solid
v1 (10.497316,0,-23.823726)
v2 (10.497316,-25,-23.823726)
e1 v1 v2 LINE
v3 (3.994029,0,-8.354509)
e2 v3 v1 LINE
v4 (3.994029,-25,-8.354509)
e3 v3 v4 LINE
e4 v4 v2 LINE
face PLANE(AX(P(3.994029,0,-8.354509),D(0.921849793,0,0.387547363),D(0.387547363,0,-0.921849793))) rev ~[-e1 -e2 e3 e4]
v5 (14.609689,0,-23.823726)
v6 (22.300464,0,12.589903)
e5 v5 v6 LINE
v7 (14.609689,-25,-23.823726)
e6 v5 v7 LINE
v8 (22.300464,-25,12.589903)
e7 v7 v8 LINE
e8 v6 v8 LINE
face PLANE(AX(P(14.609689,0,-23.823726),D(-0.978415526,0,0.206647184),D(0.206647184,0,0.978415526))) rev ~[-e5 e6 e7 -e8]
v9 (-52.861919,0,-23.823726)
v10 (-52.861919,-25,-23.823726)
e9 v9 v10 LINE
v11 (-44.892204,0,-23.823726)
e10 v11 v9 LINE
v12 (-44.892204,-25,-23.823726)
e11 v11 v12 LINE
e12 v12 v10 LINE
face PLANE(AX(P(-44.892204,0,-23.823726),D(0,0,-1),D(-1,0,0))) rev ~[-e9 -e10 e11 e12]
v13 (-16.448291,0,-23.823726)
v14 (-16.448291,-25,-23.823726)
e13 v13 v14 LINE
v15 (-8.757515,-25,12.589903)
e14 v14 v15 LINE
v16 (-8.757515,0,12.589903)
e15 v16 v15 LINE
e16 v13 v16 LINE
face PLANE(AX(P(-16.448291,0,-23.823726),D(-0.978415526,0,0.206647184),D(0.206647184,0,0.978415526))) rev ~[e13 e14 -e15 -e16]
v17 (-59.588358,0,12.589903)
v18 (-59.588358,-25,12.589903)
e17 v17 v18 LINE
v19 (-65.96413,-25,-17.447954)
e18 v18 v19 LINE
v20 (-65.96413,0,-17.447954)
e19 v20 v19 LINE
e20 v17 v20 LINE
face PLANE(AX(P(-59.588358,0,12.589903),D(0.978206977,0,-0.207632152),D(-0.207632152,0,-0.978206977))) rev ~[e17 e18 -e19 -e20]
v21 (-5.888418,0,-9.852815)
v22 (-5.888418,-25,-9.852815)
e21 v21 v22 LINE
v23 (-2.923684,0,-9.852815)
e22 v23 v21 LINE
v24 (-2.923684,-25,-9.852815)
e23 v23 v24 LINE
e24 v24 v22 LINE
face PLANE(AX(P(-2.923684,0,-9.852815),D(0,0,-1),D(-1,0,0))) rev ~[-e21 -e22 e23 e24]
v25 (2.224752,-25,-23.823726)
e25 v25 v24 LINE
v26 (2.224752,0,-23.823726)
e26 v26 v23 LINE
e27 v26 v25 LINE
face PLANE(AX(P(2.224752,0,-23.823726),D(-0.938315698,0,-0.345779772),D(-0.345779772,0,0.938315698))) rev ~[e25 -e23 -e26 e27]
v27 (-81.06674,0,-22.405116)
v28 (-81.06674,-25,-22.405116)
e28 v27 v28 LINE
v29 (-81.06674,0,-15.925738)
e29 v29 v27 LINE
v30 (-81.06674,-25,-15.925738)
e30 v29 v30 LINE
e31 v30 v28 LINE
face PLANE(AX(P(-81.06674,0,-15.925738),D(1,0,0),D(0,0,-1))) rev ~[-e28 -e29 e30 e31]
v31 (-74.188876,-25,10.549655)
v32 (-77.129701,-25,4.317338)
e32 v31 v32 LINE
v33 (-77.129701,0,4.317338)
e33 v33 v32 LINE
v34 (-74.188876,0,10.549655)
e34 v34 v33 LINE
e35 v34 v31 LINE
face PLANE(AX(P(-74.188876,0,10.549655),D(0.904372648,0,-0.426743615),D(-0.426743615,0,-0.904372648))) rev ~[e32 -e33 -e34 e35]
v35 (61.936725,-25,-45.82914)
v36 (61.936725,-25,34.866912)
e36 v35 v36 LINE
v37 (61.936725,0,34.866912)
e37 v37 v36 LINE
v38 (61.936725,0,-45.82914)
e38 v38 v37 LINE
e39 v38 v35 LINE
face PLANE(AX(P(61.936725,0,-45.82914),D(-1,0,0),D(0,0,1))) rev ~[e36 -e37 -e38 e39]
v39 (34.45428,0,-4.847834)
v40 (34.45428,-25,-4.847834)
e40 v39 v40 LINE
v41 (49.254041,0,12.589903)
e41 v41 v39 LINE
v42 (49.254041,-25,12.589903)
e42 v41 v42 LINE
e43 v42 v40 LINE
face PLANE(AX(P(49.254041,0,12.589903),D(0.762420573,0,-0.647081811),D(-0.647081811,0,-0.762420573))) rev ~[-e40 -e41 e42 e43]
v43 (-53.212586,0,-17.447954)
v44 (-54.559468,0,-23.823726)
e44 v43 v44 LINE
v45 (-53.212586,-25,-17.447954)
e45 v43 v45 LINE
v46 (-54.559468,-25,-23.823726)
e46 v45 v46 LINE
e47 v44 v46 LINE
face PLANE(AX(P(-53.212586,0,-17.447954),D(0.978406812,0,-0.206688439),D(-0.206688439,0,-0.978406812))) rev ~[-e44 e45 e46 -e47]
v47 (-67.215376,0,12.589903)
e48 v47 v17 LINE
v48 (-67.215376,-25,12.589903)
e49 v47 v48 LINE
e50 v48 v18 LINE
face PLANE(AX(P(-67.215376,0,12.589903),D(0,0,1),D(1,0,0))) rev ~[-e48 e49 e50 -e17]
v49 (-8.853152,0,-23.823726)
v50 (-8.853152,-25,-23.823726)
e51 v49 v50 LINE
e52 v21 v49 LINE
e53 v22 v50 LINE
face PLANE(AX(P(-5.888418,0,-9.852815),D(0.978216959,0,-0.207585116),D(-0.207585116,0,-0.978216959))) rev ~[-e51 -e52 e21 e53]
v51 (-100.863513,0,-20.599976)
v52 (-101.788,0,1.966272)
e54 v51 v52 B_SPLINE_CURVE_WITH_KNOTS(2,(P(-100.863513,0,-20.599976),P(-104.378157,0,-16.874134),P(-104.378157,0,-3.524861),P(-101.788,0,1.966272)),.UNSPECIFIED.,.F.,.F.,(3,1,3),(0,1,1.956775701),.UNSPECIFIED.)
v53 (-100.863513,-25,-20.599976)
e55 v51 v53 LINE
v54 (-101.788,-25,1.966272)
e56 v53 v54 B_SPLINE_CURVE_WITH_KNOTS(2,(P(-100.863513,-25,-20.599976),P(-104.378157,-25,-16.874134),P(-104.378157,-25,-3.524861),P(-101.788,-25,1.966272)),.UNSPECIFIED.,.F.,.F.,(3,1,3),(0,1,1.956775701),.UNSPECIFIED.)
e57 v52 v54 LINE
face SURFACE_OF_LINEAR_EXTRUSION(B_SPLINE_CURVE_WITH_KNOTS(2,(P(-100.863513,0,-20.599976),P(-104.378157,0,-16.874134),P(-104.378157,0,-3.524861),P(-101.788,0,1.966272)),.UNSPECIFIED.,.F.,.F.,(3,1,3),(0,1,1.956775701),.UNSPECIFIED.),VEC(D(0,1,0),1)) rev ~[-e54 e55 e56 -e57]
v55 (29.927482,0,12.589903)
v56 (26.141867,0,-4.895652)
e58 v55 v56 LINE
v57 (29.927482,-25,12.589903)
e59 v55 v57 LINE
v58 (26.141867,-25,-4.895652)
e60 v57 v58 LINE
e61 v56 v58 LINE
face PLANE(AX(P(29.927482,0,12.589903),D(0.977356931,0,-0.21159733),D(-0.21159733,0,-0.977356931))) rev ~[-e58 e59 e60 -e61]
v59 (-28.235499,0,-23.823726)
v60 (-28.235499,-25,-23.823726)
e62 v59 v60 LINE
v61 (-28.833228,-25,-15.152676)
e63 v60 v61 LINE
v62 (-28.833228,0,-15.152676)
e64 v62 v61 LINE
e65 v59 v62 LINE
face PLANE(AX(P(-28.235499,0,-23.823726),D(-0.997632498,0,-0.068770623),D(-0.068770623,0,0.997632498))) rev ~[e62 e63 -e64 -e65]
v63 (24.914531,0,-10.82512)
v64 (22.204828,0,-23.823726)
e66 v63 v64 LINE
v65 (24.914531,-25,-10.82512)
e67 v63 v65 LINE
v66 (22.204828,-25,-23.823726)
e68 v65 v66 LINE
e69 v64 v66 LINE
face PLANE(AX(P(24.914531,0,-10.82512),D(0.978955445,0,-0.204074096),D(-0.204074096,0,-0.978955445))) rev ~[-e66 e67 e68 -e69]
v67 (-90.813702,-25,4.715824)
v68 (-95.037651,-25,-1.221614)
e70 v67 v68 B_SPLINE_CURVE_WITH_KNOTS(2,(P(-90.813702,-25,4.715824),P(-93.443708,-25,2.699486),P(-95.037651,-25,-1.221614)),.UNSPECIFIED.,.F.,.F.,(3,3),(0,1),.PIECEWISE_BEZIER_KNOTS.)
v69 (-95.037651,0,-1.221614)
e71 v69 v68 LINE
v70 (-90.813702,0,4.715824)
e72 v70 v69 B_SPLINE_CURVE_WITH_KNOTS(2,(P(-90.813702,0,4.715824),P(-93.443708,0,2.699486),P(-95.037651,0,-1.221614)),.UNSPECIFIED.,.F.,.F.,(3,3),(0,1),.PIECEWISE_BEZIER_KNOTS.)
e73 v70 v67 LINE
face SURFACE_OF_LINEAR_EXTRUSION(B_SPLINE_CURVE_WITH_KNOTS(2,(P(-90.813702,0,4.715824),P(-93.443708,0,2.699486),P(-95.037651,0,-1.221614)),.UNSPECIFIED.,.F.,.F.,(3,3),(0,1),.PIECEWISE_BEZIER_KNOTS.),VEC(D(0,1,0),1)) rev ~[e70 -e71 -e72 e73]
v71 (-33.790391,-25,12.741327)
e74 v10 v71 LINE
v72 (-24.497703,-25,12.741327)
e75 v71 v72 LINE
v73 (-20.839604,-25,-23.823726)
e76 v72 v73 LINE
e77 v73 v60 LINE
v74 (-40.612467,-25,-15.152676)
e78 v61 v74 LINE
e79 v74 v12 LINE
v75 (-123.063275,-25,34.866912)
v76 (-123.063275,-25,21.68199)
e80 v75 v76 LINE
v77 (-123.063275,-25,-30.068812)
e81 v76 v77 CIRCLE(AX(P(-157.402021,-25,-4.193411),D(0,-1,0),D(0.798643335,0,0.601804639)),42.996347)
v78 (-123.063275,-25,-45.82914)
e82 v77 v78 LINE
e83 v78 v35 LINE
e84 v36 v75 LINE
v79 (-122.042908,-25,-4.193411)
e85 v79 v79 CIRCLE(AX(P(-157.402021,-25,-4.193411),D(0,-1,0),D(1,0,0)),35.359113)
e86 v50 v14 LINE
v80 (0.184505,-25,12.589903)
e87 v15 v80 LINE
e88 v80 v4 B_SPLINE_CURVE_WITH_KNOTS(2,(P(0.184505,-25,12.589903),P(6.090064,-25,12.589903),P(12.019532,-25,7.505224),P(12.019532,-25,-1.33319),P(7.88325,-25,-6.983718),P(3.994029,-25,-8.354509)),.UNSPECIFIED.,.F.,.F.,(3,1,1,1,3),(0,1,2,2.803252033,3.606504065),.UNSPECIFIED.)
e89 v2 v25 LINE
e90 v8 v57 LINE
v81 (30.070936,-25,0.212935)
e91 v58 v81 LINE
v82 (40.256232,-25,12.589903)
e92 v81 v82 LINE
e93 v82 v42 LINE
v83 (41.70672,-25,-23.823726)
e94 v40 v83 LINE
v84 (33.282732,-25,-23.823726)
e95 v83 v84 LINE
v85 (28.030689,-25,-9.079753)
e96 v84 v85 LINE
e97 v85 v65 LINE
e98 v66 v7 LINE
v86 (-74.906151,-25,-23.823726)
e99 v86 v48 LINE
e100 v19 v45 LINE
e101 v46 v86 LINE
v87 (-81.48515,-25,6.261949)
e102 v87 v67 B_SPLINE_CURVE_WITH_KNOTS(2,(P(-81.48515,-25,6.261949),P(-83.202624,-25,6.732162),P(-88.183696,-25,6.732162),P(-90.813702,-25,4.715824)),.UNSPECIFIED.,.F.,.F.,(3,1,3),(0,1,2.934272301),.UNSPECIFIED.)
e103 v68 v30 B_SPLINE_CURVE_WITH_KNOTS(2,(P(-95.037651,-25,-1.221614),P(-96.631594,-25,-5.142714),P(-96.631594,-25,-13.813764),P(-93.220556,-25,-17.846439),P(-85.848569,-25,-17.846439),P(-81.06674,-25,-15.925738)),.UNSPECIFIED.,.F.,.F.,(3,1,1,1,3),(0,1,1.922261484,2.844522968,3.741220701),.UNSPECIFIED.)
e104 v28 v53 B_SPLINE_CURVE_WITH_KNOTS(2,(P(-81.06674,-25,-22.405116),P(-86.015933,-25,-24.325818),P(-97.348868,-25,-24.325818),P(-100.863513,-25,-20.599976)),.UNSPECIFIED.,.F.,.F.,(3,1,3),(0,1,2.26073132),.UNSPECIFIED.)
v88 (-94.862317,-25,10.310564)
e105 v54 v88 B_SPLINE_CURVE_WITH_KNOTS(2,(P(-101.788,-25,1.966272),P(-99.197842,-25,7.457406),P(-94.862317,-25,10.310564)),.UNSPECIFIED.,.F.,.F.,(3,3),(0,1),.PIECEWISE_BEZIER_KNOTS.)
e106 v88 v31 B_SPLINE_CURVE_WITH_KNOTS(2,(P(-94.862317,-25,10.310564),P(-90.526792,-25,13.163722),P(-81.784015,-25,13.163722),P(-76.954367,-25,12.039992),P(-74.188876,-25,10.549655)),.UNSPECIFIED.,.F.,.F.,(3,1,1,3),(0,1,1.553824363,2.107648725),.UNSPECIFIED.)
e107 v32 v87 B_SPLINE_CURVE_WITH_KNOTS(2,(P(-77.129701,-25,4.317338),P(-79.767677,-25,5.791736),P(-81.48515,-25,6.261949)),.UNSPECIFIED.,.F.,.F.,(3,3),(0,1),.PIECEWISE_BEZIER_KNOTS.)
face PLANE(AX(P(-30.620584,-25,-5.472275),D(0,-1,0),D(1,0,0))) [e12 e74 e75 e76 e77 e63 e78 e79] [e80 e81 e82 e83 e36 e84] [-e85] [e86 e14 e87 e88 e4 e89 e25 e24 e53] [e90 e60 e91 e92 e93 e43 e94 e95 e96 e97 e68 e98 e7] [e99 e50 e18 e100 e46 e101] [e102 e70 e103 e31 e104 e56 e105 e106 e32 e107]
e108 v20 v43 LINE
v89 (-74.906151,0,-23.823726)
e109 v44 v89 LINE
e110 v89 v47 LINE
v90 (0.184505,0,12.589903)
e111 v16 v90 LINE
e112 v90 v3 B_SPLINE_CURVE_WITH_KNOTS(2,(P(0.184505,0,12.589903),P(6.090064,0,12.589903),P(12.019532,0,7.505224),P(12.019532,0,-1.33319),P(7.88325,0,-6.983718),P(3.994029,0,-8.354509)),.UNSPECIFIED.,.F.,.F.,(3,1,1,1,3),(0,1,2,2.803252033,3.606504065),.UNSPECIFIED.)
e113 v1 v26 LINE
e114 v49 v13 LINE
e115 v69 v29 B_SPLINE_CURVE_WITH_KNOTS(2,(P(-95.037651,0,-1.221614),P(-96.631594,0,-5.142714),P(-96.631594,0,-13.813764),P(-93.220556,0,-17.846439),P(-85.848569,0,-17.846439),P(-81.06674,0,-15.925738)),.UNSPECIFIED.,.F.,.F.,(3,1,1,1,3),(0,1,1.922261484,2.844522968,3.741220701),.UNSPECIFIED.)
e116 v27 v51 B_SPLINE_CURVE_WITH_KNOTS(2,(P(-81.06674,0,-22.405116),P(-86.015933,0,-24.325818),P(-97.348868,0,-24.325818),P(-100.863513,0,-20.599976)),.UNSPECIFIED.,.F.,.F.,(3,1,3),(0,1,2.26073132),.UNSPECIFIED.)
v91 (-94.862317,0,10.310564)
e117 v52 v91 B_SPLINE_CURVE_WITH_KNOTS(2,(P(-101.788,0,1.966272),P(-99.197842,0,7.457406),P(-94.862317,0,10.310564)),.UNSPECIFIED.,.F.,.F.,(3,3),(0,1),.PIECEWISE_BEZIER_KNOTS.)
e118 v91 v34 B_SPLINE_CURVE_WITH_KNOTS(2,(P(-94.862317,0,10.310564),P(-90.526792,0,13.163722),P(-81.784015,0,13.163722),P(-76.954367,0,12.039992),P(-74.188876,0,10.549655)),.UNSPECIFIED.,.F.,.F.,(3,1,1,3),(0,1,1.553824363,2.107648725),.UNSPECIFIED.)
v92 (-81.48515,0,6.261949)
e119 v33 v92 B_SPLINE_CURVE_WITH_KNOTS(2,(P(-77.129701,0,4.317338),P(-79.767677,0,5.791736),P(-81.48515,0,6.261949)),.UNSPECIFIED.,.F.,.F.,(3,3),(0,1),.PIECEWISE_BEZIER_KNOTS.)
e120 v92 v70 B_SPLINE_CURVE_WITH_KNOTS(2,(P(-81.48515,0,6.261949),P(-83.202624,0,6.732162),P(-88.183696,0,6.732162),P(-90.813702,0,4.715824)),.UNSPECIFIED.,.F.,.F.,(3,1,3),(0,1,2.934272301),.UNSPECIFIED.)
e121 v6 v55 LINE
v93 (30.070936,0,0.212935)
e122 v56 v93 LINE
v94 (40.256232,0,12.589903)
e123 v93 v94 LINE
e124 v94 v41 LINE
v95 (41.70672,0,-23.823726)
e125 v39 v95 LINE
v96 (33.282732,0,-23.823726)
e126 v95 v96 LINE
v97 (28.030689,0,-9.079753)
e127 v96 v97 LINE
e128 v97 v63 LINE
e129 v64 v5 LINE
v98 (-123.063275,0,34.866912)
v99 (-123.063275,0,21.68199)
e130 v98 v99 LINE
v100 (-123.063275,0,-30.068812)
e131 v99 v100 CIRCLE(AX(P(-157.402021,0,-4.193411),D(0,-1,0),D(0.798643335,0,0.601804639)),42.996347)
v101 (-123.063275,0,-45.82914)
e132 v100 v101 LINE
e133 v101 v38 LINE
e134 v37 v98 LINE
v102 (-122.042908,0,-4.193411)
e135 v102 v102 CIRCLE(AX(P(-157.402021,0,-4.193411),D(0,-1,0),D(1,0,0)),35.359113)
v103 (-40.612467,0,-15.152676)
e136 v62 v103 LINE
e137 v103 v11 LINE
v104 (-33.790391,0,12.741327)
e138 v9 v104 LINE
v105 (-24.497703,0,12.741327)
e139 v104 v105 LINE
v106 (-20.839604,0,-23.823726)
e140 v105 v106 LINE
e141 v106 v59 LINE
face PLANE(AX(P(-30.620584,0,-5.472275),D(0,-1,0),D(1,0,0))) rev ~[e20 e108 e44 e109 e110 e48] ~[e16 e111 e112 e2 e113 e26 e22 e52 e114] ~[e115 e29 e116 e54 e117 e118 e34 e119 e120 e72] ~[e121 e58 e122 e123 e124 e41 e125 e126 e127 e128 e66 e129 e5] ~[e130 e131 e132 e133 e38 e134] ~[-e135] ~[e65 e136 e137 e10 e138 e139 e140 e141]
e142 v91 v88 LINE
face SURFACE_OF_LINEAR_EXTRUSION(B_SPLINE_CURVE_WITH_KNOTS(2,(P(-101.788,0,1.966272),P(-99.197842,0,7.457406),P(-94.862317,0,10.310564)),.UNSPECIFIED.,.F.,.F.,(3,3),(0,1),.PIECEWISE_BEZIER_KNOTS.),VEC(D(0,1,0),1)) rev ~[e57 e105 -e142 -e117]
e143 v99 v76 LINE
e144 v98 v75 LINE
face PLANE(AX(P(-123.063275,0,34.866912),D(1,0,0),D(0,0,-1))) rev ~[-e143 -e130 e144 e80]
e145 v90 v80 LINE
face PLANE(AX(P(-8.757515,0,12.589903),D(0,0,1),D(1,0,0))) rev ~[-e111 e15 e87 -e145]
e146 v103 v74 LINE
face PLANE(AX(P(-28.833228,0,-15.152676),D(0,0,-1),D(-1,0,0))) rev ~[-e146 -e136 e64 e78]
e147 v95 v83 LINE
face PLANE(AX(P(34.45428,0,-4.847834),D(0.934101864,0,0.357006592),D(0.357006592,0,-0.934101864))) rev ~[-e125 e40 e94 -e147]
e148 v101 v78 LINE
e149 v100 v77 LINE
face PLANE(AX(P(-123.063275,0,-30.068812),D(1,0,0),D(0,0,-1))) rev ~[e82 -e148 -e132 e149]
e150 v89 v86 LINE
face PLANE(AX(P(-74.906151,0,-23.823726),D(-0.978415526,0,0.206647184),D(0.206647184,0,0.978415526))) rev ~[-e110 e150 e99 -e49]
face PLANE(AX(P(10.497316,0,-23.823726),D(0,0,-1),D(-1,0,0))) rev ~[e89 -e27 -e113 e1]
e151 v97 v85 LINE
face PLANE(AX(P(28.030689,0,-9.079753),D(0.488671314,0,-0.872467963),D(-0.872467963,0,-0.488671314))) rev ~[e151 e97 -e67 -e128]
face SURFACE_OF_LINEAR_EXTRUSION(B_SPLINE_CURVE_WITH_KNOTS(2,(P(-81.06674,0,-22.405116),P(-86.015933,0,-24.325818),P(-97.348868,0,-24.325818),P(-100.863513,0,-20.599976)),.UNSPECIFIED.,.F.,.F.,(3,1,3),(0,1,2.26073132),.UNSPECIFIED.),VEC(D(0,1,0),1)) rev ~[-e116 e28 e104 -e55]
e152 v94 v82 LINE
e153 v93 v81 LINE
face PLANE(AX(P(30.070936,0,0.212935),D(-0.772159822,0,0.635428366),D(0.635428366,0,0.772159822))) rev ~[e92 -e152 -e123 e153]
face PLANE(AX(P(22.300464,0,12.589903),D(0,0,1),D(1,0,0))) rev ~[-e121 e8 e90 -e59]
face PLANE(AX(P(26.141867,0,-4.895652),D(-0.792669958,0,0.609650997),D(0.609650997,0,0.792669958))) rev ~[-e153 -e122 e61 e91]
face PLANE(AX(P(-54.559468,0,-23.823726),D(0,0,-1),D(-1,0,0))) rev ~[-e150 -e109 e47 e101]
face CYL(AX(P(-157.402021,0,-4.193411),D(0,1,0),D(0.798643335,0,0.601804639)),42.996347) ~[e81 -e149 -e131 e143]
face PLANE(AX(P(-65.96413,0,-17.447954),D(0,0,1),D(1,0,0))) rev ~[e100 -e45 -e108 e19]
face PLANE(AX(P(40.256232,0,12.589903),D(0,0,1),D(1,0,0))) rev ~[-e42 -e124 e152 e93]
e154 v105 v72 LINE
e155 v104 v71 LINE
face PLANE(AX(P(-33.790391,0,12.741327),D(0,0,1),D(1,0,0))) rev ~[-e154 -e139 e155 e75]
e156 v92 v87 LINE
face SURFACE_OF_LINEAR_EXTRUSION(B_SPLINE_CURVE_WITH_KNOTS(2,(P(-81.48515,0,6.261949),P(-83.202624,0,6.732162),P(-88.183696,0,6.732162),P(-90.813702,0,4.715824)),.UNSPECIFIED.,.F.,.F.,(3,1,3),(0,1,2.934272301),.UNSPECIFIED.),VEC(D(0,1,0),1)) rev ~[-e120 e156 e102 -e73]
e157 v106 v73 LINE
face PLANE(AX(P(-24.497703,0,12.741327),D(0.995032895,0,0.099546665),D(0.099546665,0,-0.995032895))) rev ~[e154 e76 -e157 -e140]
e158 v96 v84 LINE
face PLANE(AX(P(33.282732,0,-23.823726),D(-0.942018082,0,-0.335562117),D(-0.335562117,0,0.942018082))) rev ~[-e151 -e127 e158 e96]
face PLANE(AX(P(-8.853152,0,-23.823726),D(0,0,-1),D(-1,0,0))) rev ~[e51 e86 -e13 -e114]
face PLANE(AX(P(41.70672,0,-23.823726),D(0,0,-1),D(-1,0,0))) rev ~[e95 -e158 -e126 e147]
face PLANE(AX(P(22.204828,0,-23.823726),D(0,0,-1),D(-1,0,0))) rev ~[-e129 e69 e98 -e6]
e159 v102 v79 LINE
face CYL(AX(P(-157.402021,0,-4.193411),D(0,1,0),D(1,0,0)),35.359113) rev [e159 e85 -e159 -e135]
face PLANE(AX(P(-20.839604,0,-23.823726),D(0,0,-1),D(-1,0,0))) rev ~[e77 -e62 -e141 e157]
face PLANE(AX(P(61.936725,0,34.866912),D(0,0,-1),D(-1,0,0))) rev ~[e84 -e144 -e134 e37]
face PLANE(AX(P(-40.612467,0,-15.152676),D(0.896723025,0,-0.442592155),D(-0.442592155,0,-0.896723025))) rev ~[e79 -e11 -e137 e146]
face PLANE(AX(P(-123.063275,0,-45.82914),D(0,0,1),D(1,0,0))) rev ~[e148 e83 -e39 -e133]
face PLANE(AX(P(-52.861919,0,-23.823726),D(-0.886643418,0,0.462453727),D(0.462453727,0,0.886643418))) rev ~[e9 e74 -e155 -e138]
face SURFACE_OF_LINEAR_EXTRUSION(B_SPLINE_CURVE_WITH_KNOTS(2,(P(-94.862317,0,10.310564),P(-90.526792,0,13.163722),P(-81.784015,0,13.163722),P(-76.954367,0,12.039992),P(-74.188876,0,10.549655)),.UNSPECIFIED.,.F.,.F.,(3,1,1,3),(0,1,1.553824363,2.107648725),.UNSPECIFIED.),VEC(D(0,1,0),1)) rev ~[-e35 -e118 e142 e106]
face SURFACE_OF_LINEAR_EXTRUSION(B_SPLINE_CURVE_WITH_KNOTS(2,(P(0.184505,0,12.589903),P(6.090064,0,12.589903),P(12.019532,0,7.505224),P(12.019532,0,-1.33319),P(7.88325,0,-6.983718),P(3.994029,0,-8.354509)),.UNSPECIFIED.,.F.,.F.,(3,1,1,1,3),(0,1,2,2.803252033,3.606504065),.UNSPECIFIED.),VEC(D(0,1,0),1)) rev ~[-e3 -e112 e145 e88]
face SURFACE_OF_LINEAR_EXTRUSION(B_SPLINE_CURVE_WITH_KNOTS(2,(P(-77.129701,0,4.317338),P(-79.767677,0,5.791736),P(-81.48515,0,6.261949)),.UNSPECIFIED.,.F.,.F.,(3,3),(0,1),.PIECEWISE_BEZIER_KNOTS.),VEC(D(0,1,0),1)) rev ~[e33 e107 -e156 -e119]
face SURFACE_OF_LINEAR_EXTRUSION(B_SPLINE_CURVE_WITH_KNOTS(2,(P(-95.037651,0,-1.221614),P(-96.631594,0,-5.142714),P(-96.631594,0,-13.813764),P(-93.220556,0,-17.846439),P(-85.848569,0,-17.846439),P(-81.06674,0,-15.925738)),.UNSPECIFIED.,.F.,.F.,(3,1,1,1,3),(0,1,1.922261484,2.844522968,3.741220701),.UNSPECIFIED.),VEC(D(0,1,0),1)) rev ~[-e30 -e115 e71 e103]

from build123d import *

# Parameters (mm, degrees)
F0_R     = 35.3591127091
F1_DEPTH = 25


with BuildPart() as f1:
    # F0 (on Front) → F1 (new body)
    with BuildSketch(Plane.XZ):
        with BuildLine():
            Line((61.9367249054, 34.8669122506), (-123.0632750946, 34.8669122506))
            Line((-123.0632750946, 34.8669122506), (-123.0632750946, 21.6819903858))
            ThreePointArc((-123.0632750946, 21.6819903858), (-116.6274794012, 9.4492653106), (-114.4056740389, -4.193410743))
            ThreePointArc((-114.4056740389, -4.193410743), (-116.6274794012, -17.8360867967), (-123.0632750946, -30.0688118719))
            Line((-123.0632750946, -30.0688118719), (-123.0632750946, -45.8291395163))
            Line((-123.0632750946, -45.8291395163), (61.9367249054, -45.8291395163))
            Line((61.9367249054, -45.8291395163), (61.9367249054, 34.8669122506))
        make_face()
        with BuildLine():
            add(Edge.make_bspline(
                [(-81.4851504642, 6.2619487625), (-83.2026240645, 6.7321619524), (-84.9001733771, 6.7321619524)],
                knots=[0, 0, 0, 1, 1, 1], degree=2))
            add(Edge.make_bspline(
                [(-84.9001733771, 6.7321619524), (-88.1836959912, 6.7321619524), (-90.8137019684, 4.7158240365)],
                knots=[0, 0, 0, 1, 1, 1], degree=2))
            add(Edge.make_bspline(
                [(-90.8137019684, 4.7158240365), (-93.4437079457, 2.6994861206), (-95.0376509623, -1.2216137001)],
                knots=[0, 0, 0, 1, 1, 1], degree=2))
            add(Edge.make_bspline(
                [(-95.0376509623, -1.2216137001), (-96.6315939788, -5.1427135208), (-96.6315939788, -9.6535722576)],
                knots=[0, 0, 0, 1, 1, 1], degree=2))
            add(Edge.make_bspline(
                [(-96.6315939788, -9.6535722576), (-96.6315939788, -13.8137635308), (-94.9260749511, -15.8301014467)],
                knots=[0, 0, 0, 1, 1, 1], degree=2))
            add(Edge.make_bspline(
                [(-94.9260749511, -15.8301014467), (-93.2205559234, -17.8464393626), (-89.4827595496, -17.8464393626)],
                knots=[0, 0, 0, 1, 1, 1], degree=2))
            add(Edge.make_bspline(
                [(-89.4827595496, -17.8464393626), (-85.8485694719, -17.8464393626), (-81.0667404223, -15.9257380277)],
                knots=[0, 0, 0, 1, 1, 1], degree=2))
            Line((-81.0667404223, -15.9257380277), (-81.0667404223, -22.4051163899))
            add(Edge.make_bspline(
                [(-81.0667404223, -22.4051163899), (-86.0159334887, -24.3258177248), (-91.0288842757, -24.3258177248)],
                knots=[0, 0, 0, 1, 1, 1], degree=2))
            add(Edge.make_bspline(
                [(-91.0288842757, -24.3258177248), (-97.3488683362, -24.3258177248), (-100.8635126877, -20.5999759237)],
                knots=[0, 0, 0, 1, 1, 1], degree=2))
            add(Edge.make_bspline(
                [(-100.8635126877, -20.5999759237), (-104.3781570392, -16.8741341225), (-104.3781570392, -10.0520580117)],
                knots=[0, 0, 0, 1, 1, 1], degree=2))
            add(Edge.make_bspline(
                [(-104.3781570392, -10.0520580117), (-104.3781570392, -3.524861359), (-101.7879996373, 1.9662723329)],
                knots=[0, 0, 0, 1, 1, 1], degree=2))
            add(Edge.make_bspline(
                [(-101.7879996373, 1.9662723329), (-99.1978422354, 7.4574060249), (-94.8623172304, 10.3105640245)],
                knots=[0, 0, 0, 1, 1, 1], degree=2))
            add(Edge.make_bspline(
                [(-94.8623172304, 10.3105640245), (-90.5267922255, 13.1637220241), (-84.9001733771, 13.1637220241)],
                knots=[0, 0, 0, 1, 1, 1], degree=2))
            add(Edge.make_bspline(
                [(-84.9001733771, 13.1637220241), (-81.7840147798, 13.1637220241), (-79.3691911097, 12.6018571108)],
                knots=[0, 0, 0, 1, 1, 1], degree=2))
            add(Edge.make_bspline(
                [(-79.3691911097, 12.6018571108), (-76.9543674396, 12.0399921975), (-74.188876306, 10.549655477)],
                knots=[0, 0, 0, 1, 1, 1], degree=2))
            Line((-74.188876306, 10.549655477), (-77.1297011715, 4.3173382823))
            add(Edge.make_bspline(
                [(-77.1297011715, 4.3173382823), (-79.7676768638, 5.7917355726), (-81.4851504642, 6.2619487625)],
                knots=[0, 0, 0, 1, 1, 1], degree=2))
        make_face(mode=Mode.SUBTRACT)
        Polygon((-54.5594680573, -23.8237256746), (-74.9061506634, -23.8237256746), (-67.2153756086, 12.5899025382), (-59.5883582745, 12.5899025382), (-65.9641303406, -17.4479536085), (-53.2125862083, -17.4479536085), align=None, mode=Mode.SUBTRACT)
        Polygon((-28.2354991392, -23.8237256746), (-28.8332277704, -15.1526756647), (-40.6124666626, -15.1526756647), (-44.892203662, -23.8237256746), (-52.8619187447, -23.8237256746), (-33.7903905518, 12.7413271247), (-24.4977027654, 12.7413271247), (-20.8396035425, -23.8237256746), align=None, mode=Mode.SUBTRACT)
        with BuildLine():
            Line((-2.9236840366, -9.8528151347), (-5.8884180473, -9.8528151347))
            Line((-5.8884180473, -9.8528151347), (-8.8531520581, -23.8237256746))
            Line((-8.8531520581, -23.8237256746), (-16.4482905319, -23.8237256746))
            Line((-16.4482905319, -23.8237256746), (-8.7575154771, 12.5899025382))
            Line((-8.7575154771, 12.5899025382), (0.1845048457, 12.5899025382))
            add(Edge.make_bspline(
                [(0.1845048457, 12.5899025382), (6.0900637219, 12.5899025382), (9.0547977327, 10.0475634268)],
                knots=[0, 0, 0, 1, 1, 1], degree=2))
            add(Edge.make_bspline(
                [(9.0547977327, 10.0475634268), (12.0195317435, 7.5052243154), (12.0195317435, 2.6038495396)],
                knots=[0, 0, 0, 1, 1, 1], degree=2))
            add(Edge.make_bspline(
                [(12.0195317435, 2.6038495396), (12.0195317435, -1.3331897113), (9.9513906795, -4.1584537081)],
                knots=[0, 0, 0, 1, 1, 1], degree=2))
            add(Edge.make_bspline(
                [(9.9513906795, -4.1584537081), (7.8832496155, -6.9837177049), (3.9940286552, -8.3545086991)],
                knots=[0, 0, 0, 1, 1, 1], degree=2))
            Line((3.9940286552, -8.3545086991), (10.4973161627, -23.8237256746))
            Line((10.4973161627, -23.8237256746), (2.2247519068, -23.8237256746))
            Line((2.2247519068, -23.8237256746), (-2.9236840366, -9.8528151347))
        make_face(mode=Mode.SUBTRACT)
        Polygon((34.4542797012, -4.8478340628), (41.7067204265, -23.8237256746), (33.2827315841, -23.8237256746), (28.0306893446, -9.0797527717), (24.9145307472, -10.8251203748), (22.2048276191, -23.8237256746), (14.6096891453, -23.8237256746), (22.3004642001, 12.5899025382), (29.9274815343, 12.5899025382), (26.14186687, -4.8956523532), (30.0709364057, 0.2129350148), (40.2562322814, 12.5899025382), (49.2540406098, 12.5899025382), align=None, mode=Mode.SUBTRACT)
        with BuildLine():
            ThreePointArc((-114.4056740389, -4.193410743), (-116.6274794012, 9.4492653106), (-123.0632750946, 21.6819903858))
            ThreePointArc((-123.0632750946, 21.6819903858), (-200.3983681841, -4.193410743), (-123.0632750946, -30.0688118719))
            ThreePointArc((-123.0632750946, -30.0688118719), (-116.6274794012, -17.8360867967), (-114.4056740389, -4.193410743))
        make_face()
        with Locations((-157.4020211115, -4.193410743)):
            Circle(F0_R, mode=Mode.SUBTRACT)
    extrude(amount=F1_DEPTH)


solid = f1.part
